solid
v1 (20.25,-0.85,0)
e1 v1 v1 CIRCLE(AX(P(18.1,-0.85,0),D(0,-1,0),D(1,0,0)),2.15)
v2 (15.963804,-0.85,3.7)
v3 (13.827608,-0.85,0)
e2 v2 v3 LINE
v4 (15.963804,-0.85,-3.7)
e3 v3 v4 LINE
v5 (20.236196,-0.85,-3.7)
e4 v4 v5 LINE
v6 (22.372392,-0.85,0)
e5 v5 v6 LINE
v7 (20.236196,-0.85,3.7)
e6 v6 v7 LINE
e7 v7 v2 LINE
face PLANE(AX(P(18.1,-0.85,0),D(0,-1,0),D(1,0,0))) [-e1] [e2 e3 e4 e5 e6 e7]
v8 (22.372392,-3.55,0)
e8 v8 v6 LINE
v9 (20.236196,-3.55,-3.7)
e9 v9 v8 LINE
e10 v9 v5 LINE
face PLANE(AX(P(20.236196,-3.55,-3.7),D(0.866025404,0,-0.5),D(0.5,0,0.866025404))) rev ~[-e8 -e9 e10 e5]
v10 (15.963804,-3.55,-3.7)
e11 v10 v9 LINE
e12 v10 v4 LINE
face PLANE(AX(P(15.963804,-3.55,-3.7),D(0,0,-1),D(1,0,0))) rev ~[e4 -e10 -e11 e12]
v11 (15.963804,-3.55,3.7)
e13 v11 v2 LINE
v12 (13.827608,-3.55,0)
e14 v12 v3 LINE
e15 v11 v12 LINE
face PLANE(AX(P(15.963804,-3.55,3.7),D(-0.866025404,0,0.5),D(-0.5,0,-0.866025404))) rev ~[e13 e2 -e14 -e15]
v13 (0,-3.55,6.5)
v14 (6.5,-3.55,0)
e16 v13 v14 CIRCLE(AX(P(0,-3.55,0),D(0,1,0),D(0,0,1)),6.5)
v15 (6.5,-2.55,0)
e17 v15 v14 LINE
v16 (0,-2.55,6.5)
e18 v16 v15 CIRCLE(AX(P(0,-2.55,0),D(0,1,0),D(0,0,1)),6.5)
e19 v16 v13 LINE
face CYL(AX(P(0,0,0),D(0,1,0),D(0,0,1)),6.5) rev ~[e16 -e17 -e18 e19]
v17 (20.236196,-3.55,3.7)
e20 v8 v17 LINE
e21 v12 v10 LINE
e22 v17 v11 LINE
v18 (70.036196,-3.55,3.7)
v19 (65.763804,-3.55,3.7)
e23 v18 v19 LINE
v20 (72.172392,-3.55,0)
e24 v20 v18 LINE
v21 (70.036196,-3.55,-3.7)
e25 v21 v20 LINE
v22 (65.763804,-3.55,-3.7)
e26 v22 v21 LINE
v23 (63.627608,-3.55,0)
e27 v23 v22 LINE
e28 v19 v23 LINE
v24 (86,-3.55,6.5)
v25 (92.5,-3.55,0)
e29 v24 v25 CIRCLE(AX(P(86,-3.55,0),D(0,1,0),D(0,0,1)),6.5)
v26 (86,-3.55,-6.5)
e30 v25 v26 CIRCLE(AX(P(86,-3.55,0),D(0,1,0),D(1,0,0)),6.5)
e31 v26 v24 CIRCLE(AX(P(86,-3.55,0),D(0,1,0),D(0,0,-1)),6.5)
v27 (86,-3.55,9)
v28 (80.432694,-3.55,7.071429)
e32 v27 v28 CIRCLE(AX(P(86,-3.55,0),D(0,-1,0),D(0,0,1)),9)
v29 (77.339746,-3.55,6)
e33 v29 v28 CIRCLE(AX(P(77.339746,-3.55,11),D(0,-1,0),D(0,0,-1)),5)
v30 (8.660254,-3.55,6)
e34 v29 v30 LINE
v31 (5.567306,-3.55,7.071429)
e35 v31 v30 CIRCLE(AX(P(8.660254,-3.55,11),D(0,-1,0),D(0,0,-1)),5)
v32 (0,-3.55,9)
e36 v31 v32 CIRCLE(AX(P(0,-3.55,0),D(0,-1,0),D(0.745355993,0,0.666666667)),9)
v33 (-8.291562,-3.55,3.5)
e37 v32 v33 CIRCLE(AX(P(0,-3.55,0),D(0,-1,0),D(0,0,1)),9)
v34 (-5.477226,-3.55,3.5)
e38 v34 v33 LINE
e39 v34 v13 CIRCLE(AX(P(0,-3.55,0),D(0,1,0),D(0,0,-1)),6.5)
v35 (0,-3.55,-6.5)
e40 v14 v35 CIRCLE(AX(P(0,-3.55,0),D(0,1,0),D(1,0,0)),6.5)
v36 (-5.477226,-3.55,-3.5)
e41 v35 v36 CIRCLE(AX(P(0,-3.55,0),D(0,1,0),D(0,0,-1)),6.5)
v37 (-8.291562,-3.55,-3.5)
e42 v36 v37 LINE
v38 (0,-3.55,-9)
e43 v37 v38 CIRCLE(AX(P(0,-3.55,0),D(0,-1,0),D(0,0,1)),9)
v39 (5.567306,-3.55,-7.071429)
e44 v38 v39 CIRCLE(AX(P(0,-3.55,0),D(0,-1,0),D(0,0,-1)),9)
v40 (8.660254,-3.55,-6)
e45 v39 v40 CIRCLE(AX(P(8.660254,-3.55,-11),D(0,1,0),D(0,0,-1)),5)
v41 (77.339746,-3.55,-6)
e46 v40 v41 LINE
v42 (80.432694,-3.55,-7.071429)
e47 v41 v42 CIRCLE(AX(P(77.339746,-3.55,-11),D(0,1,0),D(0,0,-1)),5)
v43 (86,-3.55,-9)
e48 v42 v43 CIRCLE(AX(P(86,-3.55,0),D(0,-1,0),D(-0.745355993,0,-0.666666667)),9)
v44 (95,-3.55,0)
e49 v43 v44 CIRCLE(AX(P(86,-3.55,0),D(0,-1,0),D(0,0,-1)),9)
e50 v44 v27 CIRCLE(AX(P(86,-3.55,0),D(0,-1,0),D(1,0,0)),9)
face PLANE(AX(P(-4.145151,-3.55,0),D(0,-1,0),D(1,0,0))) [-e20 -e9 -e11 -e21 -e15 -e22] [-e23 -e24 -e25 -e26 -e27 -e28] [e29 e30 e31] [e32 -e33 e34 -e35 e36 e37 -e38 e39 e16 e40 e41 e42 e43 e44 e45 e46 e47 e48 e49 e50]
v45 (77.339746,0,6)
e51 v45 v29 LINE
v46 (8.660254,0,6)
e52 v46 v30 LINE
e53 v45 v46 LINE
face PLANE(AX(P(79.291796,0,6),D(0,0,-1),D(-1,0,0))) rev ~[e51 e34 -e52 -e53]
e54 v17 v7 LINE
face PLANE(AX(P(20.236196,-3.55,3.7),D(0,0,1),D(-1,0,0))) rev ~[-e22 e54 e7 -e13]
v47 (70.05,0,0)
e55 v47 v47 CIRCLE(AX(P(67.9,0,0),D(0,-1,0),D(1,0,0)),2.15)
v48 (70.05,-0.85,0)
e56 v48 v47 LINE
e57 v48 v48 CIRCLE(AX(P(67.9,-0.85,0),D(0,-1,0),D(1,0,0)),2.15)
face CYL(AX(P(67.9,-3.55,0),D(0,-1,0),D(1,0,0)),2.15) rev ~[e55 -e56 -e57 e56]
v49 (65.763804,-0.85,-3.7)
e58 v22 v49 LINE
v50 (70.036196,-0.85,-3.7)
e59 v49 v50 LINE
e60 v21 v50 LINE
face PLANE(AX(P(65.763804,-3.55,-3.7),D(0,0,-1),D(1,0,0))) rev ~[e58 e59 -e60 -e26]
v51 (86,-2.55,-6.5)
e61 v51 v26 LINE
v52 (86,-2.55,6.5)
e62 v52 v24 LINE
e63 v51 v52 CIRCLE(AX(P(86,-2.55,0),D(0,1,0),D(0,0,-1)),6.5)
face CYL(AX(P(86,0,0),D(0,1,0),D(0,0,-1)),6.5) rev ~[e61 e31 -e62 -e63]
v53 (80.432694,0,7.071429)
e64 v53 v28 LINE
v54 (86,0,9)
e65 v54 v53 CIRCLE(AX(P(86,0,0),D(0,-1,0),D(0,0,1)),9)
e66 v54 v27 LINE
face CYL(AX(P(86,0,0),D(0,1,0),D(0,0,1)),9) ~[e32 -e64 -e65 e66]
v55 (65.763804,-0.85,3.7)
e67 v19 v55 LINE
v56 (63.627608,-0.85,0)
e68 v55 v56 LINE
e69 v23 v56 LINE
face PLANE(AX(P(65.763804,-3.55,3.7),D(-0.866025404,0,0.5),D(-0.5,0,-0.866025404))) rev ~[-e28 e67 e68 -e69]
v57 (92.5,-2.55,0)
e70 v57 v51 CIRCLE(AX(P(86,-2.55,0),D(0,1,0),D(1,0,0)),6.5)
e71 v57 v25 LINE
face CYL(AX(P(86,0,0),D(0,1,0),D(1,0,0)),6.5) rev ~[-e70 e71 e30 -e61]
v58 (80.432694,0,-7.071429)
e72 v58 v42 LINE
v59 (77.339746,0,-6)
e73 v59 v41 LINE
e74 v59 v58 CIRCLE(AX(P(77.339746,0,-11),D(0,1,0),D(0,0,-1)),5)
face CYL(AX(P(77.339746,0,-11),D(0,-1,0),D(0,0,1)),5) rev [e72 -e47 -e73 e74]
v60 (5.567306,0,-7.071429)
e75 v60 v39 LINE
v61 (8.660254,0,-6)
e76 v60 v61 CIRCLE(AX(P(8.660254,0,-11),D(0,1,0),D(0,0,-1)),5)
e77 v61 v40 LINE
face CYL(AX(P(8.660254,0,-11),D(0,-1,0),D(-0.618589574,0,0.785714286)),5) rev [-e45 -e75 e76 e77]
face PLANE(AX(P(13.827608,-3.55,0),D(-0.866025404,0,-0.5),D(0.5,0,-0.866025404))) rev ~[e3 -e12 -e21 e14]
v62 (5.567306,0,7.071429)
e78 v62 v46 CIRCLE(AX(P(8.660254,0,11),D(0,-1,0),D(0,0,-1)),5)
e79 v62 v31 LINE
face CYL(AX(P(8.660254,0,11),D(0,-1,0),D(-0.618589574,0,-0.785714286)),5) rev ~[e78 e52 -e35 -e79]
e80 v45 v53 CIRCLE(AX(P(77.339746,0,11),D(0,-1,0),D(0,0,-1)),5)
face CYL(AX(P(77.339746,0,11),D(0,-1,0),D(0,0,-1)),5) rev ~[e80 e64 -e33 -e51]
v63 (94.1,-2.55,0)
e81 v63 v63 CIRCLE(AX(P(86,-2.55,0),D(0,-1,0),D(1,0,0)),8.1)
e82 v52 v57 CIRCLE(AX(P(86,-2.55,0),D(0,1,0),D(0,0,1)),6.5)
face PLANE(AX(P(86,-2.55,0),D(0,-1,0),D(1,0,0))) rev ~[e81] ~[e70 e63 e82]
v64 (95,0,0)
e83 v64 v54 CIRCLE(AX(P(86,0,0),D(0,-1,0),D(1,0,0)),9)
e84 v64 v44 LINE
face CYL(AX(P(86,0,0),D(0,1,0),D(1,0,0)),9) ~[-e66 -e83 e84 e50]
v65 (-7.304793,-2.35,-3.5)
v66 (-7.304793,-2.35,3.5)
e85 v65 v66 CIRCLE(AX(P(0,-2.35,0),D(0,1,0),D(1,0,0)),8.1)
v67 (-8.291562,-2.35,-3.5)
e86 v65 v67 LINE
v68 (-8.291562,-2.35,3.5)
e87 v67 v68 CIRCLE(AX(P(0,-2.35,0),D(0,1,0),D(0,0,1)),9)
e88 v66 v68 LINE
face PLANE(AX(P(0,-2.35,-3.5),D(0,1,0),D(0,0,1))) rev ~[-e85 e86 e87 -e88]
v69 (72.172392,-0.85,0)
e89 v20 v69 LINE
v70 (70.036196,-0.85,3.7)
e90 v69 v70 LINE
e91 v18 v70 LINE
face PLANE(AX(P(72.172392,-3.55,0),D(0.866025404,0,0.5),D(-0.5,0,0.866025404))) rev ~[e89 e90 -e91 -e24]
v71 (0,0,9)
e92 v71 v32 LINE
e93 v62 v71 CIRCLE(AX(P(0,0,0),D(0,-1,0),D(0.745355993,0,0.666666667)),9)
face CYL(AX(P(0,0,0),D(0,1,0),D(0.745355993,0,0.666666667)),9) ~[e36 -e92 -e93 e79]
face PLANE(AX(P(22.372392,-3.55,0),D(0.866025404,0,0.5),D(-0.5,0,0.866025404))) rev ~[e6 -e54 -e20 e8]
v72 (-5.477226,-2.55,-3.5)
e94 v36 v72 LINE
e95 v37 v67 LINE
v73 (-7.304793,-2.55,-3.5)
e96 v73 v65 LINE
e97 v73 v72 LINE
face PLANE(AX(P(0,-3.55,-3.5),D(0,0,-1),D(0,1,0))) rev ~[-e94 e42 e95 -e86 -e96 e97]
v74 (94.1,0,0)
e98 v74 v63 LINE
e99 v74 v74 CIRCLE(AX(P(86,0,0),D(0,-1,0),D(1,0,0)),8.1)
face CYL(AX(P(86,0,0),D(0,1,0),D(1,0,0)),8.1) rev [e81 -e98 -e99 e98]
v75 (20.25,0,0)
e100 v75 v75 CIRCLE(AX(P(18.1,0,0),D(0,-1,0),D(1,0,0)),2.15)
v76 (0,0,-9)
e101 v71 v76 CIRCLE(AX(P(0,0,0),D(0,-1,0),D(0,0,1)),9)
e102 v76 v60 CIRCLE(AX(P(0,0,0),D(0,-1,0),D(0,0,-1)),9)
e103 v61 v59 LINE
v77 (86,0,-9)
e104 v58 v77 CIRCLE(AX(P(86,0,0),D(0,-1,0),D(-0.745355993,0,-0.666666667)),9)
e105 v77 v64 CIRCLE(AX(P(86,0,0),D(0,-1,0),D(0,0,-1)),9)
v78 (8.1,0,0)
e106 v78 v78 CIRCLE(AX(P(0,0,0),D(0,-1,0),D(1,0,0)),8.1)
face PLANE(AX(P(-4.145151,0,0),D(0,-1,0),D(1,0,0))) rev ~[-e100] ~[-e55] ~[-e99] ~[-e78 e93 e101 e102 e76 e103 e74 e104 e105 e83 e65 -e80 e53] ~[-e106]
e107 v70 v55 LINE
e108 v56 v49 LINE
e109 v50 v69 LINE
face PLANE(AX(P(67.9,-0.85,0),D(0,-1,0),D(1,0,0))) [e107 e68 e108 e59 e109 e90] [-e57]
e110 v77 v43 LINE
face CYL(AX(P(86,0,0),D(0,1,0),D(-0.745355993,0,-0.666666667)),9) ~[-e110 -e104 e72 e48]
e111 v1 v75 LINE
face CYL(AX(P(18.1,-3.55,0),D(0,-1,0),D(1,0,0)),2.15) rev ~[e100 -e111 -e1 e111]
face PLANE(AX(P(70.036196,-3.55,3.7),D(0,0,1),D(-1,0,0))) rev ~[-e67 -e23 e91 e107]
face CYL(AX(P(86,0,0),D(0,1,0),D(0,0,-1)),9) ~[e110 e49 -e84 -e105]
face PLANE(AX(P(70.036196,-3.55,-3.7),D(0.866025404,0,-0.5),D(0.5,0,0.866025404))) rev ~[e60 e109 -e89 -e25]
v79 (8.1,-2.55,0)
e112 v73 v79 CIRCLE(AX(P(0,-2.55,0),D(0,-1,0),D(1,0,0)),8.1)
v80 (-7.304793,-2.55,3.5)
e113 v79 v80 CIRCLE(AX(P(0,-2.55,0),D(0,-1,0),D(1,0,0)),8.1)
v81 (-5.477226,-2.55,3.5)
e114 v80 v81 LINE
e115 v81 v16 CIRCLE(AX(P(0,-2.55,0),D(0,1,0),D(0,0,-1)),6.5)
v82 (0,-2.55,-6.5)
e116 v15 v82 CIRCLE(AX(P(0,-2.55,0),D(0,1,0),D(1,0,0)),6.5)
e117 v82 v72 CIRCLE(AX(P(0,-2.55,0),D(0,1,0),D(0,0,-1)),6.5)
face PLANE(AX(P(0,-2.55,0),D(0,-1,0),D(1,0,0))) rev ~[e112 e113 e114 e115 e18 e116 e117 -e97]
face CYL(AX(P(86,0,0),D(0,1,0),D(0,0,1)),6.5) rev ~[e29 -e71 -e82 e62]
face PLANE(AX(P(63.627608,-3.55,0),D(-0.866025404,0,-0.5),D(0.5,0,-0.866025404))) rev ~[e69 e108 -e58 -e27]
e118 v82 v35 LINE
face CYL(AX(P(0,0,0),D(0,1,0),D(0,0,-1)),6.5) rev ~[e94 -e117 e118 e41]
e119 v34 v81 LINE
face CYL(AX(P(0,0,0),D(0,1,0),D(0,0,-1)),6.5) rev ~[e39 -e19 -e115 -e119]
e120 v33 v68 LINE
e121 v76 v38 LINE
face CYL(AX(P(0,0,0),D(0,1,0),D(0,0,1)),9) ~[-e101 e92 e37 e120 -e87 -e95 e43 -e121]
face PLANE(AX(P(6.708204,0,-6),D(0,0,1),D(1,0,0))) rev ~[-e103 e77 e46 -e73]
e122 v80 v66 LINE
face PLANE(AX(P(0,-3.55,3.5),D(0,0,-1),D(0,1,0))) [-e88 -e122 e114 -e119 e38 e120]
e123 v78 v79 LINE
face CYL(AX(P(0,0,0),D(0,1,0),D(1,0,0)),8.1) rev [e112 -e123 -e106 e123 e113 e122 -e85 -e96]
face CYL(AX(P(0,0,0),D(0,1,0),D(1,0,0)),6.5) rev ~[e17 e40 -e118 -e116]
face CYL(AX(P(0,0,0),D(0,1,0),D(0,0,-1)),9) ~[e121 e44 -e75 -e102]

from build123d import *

# Parameters (mm, degrees)
F1_DEPTH = 3.55
F2_R     = 8.1
F3_DEPTH = 2.55
F4_R     = 5
F5_R     = 2.15
F6_DEPTH = 2.7
F7_DEPTH = 3.551
F8_W     = 1.2
F8_H     = 7
F9_DEPTH = 200


# Not quite as in the source:
# - a feature names something its author has since deleted; it is built from what else it names


with BuildPart() as f1:
    # F0 (on Front) → F1 (new body)
    with BuildSketch(Plane.XZ):
        with BuildLine():
            Line((0, 6.5), (0, 9))
            ThreePointArc((0, 9), (-9, 0), (0, -9))
            Line((0, -9), (0, -6.5))
            ThreePointArc((0, -6.5), (-6.5, 0), (0, 6.5))
        make_face()
        with BuildLine():
            ThreePointArc((6.7082039325, -6), (8.4075512307, -3.211398808), (9, 0))
            ThreePointArc((9, 0), (8.4075512307, 3.211398808), (6.7082039325, 6))
            ThreePointArc((6.7082039325, 6), (3.6742346142, 8.2158383626), (0, 9))
            Line((0, 9), (0, 6.5))
            ThreePointArc((0, 6.5), (4.5961940777, 4.5961940777), (6.5, 0))
            ThreePointArc((6.5, 0), (4.5961940777, -4.5961940777), (0, -6.5))
            Line((0, -6.5), (0, -9))
            ThreePointArc((0, -9), (3.6742346142, -8.2158383626), (6.7082039325, -6))
        make_face()
        with BuildLine():
            ThreePointArc((86, 9), (82.3257653858, 8.2158383626), (79.2917960675, 6))
            ThreePointArc((79.2917960675, 6), (77, 0), (79.2917960675, -6))
            ThreePointArc((79.2917960675, -6), (82.3257653858, -8.2158383626), (86, -9))
            Line((86, -9), (86, -6.5))
            ThreePointArc((86, -6.5), (79.5, 0), (86, 6.5))
            Line((86, 6.5), (86, 9))
        make_face()
        with BuildLine():
            ThreePointArc((95, 0), (92.3639610307, 6.3639610307), (86, 9))
            Line((86, 9), (86, 6.5))
            ThreePointArc((86, 6.5), (90.5961940777, 4.5961940777), (92.5, 0))
            ThreePointArc((92.5, 0), (90.5961940777, -4.5961940777), (86, -6.5))
            Line((86, -6.5), (86, -9))
            ThreePointArc((86, -9), (92.3639610307, -6.3639610307), (95, 0))
        make_face()
        with BuildLine():
            ThreePointArc((6.7082039325, 6), (8.4075512307, 3.211398808), (9, 0))
            ThreePointArc((9, 0), (8.4075512307, -3.211398808), (6.7082039325, -6))
            Line((6.7082039325, -6), (79.2917960675, -6))
            ThreePointArc((79.2917960675, -6), (77, 0), (79.2917960675, 6))
            Line((79.2917960675, 6), (6.7082039325, 6))
        make_face()
    extrude(amount=F1_DEPTH)

    # F2 (on face) → F3 (cut)
    with BuildSketch(Plane.XZ):
        Circle(F2_R)
        with Locations((86, 0)):
            Circle(F2_R)
    extrude(amount=F3_DEPTH, mode=Mode.SUBTRACT)

    # F4
    f4_edges = [f1.edges().sort_by_distance(p)[0] for p in [
        (6.708204, -1.775, -6),
        (6.708204, -1.775, 6),
        (79.291796, -1.775, 6),
        (79.291796, -1.775, -6),
    ]]
    fillet(f4_edges, radius=F4_R)

    # F5 (on face) → F6 (cut)
    with BuildSketch(Plane.XZ.offset(3.55)):
        Polygon((22.372391992, 0), (20.236195996, 3.7), (15.963804004, 3.7), (13.827608008, 0), (15.963804004, -3.7), (20.236195996, -3.7), align=None)
        with Locations((18.1, 0)):
            Circle(F5_R, mode=Mode.SUBTRACT)
        Polygon((63.627608008, 0), (65.763804004, -3.7), (70.036195996, -3.7), (72.172391992, 0), (70.036195996, 3.7), (65.763804004, 3.7), align=None)
        with Locations((67.9, 0)):
            Circle(F5_R, mode=Mode.SUBTRACT)
    extrude(amount=-F6_DEPTH, mode=Mode.SUBTRACT)

    # F5 (on face) → F7 (cut, through all)
    with BuildSketch(Plane.XZ.offset(3.55)):
        with Locations((18.1, 0)):
            Circle(F5_R)
        with Locations((67.9, 0)):
            Circle(F5_R)
    extrude(amount=-F7_DEPTH, mode=Mode.SUBTRACT)

    # F8 (on Right) → F9 (cut)
    with BuildSketch(Plane.YZ):
        with Locations((-2.95, 0)):
            Rectangle(F8_W, F8_H)
    extrude(amount=-F9_DEPTH, mode=Mode.SUBTRACT)


solid = f1.part
